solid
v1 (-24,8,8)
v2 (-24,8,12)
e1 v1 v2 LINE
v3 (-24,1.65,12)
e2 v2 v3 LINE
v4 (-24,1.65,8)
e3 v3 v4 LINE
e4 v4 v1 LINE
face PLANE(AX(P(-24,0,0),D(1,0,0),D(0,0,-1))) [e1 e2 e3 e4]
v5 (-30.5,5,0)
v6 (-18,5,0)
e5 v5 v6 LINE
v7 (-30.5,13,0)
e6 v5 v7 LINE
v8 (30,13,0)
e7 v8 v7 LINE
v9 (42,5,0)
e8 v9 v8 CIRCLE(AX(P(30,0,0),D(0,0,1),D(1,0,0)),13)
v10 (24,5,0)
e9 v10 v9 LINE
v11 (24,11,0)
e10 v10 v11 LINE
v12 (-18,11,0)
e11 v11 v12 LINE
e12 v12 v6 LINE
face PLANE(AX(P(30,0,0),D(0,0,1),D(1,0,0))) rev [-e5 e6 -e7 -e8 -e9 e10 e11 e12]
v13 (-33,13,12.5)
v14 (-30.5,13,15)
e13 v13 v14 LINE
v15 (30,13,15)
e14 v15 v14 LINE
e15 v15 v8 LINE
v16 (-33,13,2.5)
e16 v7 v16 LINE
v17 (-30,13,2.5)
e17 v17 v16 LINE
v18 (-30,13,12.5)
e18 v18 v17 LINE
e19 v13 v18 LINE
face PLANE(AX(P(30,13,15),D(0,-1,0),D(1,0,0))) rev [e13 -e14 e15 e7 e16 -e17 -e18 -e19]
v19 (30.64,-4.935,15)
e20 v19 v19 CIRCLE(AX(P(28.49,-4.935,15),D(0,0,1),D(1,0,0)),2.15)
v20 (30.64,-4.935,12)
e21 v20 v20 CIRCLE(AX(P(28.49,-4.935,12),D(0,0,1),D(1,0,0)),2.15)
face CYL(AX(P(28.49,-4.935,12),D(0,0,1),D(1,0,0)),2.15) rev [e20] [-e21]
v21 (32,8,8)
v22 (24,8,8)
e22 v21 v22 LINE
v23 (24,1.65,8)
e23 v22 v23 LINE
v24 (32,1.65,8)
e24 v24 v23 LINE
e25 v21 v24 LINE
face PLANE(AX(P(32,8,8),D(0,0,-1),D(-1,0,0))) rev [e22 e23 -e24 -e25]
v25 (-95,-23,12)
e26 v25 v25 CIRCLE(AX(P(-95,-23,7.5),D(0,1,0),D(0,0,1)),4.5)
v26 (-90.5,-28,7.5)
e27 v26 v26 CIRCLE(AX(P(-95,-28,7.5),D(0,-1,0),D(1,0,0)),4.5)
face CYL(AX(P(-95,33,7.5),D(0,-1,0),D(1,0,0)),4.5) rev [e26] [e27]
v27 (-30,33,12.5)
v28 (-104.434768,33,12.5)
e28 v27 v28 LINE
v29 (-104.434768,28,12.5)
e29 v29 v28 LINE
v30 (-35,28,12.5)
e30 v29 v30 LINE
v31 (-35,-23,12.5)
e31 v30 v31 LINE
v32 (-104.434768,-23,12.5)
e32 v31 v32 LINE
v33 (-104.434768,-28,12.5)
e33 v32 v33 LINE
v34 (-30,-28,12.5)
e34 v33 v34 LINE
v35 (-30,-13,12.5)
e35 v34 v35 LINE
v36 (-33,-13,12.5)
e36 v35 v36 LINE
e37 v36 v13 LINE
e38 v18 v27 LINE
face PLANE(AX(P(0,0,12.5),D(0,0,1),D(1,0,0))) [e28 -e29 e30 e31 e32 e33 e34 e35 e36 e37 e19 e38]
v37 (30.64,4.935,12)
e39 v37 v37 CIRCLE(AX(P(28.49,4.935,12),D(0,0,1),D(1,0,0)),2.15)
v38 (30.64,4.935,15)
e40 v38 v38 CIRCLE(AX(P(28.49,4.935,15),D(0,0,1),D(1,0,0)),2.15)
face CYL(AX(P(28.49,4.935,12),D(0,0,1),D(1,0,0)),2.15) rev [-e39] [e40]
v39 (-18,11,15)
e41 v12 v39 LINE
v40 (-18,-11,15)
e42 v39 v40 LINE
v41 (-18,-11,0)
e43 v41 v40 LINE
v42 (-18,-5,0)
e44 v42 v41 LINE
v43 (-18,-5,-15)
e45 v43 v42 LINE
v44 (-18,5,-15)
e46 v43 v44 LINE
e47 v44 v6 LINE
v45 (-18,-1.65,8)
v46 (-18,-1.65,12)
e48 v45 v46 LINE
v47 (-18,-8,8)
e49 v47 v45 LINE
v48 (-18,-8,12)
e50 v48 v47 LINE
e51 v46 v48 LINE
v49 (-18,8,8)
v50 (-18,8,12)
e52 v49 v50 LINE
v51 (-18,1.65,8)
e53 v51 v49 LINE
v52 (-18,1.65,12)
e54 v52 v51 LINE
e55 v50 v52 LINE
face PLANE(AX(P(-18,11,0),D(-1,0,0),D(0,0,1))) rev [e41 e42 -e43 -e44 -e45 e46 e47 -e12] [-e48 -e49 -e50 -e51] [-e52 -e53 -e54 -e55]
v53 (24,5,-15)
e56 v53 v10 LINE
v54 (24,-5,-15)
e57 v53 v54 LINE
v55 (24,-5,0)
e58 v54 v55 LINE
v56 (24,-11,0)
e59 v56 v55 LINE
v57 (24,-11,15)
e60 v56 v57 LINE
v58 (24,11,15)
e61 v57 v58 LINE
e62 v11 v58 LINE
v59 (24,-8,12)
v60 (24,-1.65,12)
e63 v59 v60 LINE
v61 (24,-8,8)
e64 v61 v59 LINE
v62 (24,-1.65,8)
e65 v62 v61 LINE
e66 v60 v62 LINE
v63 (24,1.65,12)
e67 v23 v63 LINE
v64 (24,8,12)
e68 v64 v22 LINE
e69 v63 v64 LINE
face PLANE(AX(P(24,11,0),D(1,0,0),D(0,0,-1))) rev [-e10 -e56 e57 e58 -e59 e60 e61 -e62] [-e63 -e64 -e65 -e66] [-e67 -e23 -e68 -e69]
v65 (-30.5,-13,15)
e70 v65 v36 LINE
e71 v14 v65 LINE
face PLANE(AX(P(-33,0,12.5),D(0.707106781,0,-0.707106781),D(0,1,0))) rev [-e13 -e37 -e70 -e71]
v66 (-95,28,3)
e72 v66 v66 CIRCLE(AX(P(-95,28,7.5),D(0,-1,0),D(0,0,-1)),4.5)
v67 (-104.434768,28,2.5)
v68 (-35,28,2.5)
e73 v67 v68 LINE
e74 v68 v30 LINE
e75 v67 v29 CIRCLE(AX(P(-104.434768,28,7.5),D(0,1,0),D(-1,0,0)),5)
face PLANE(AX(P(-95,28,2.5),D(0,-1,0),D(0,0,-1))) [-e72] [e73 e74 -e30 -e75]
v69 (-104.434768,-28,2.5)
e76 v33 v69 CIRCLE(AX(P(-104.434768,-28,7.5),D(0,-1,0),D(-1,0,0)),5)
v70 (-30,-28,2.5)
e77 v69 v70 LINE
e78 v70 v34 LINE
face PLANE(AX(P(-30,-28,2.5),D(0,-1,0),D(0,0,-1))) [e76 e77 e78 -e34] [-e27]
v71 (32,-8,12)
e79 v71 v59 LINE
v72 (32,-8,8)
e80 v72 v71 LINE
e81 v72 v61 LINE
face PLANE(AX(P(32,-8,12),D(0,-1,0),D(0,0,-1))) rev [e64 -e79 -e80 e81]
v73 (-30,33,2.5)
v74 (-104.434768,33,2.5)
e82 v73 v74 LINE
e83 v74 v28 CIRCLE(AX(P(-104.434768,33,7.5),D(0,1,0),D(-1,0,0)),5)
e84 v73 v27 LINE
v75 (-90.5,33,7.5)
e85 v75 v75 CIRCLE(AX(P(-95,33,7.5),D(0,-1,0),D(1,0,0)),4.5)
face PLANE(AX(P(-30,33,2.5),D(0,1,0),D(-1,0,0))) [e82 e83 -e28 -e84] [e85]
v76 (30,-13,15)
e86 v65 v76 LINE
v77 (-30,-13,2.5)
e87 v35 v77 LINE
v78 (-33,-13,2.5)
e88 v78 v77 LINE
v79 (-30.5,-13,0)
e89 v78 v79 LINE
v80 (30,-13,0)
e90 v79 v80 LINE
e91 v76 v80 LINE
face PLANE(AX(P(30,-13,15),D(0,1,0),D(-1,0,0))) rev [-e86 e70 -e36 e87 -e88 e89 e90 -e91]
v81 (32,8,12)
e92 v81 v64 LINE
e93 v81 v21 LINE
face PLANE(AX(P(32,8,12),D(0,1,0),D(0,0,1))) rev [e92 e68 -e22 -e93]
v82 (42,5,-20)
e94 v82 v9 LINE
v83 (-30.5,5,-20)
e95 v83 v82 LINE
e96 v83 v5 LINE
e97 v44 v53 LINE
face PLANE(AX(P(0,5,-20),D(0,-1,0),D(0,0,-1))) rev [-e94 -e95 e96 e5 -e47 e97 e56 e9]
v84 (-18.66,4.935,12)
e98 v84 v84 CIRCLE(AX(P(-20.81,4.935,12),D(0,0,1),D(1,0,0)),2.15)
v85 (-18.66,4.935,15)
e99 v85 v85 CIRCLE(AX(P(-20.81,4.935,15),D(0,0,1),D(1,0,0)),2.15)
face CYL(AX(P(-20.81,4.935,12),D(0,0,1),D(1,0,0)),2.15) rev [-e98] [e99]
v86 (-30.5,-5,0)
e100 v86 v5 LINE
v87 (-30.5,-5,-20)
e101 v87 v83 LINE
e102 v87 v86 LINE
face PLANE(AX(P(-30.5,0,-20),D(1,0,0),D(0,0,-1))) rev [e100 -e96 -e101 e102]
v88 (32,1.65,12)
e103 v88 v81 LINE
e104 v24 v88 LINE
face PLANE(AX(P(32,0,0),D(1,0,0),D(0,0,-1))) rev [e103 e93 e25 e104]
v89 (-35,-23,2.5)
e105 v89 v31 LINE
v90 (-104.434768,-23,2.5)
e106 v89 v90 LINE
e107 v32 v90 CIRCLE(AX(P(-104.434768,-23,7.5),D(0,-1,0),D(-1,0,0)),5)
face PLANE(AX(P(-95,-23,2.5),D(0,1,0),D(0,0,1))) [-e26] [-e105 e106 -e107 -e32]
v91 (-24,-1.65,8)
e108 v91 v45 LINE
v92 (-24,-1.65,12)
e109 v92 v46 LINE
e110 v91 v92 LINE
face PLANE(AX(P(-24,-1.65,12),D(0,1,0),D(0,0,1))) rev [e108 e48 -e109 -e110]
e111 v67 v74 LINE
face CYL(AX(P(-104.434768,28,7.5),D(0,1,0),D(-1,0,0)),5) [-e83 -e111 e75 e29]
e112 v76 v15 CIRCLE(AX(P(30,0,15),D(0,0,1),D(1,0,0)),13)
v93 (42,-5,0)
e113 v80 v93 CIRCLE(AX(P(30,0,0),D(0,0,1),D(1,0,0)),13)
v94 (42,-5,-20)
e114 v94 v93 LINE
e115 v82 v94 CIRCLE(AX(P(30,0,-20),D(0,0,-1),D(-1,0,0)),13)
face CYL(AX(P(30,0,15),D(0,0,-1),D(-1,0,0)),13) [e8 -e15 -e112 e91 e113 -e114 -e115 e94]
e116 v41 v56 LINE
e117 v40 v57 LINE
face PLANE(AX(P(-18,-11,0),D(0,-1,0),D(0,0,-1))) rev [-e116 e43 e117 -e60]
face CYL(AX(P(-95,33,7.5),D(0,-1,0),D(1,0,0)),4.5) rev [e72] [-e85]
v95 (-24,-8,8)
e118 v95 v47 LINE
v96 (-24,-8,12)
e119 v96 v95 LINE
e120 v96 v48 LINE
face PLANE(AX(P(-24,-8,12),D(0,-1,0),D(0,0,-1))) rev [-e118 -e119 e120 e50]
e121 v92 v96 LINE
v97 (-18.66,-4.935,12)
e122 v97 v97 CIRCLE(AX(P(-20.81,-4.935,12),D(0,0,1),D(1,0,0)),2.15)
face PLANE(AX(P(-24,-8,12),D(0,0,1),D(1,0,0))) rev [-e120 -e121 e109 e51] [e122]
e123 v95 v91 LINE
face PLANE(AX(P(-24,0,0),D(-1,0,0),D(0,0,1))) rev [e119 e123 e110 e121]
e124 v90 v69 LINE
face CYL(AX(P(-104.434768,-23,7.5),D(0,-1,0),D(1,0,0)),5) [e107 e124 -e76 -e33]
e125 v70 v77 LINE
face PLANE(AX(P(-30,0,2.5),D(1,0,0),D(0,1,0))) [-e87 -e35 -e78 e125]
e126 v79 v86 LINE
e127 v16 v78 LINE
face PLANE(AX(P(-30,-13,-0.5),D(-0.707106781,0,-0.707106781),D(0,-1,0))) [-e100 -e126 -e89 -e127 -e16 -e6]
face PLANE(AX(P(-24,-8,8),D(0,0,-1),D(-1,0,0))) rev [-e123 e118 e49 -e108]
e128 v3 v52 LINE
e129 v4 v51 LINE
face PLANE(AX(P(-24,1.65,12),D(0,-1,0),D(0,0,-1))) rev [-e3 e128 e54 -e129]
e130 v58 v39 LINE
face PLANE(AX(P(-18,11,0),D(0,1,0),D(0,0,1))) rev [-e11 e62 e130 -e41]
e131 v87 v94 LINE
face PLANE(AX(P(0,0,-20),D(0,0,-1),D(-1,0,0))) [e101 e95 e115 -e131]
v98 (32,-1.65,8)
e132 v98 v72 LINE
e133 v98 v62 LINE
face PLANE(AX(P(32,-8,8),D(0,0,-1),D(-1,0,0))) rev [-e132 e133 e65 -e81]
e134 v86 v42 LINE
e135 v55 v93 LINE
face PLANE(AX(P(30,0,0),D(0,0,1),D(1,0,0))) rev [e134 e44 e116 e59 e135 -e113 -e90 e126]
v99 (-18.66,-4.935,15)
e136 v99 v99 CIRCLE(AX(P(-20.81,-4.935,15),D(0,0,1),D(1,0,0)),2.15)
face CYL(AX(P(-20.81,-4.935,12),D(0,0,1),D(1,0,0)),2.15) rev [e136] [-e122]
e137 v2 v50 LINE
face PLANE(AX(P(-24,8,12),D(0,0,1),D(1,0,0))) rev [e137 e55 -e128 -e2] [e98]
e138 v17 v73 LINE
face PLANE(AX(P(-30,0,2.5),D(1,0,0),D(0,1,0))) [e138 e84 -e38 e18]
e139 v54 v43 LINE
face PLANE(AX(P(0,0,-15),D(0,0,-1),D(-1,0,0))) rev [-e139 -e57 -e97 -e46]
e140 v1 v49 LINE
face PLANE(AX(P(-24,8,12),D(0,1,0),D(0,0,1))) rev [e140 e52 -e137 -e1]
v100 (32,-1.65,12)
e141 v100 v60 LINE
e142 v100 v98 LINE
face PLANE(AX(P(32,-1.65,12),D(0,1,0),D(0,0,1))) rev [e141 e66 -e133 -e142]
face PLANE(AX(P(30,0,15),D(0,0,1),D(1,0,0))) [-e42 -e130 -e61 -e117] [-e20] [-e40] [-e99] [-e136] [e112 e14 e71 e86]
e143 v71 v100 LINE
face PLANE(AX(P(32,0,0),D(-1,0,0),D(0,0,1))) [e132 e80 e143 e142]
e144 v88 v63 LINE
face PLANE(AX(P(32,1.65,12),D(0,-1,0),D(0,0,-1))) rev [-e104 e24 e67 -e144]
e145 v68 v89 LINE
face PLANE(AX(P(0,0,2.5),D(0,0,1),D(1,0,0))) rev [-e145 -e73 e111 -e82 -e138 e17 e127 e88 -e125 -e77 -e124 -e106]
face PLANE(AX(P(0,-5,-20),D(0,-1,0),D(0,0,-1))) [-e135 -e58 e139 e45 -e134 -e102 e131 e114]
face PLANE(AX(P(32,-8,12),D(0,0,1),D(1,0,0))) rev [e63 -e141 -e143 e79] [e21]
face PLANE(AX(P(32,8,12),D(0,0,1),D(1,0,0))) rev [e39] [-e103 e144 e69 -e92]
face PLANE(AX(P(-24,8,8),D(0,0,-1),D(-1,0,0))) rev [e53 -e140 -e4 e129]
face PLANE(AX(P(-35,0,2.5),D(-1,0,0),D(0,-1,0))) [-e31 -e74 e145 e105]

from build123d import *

# Parameters (mm, degrees)
BOSS_EXTRU_1_DEPTH      = 15
ESQUISSE2_W             = 42
ESQUISSE2_H             = 22
ENL_V_MAT_EXTRU_1_DEPTH = 48.360320945
ESQUISSE4_R             = 2.15
ENL_V_MAT_EXTRU_2_DEPTH = 3
ESQUISSE5_W             = 4
ESQUISSE5_H             = 6.35
ENL_V_MAT_EXTRU_3_DEPTH = 6
ESQUISSE6_W             = 4
ESQUISSE6_H             = 6.35
ENL_V_MAT_EXTRU_4_DEPTH = 8
BOSS_EXTRU_2_DEPTH      = 5
BOSS_EXTRU_2_DEPTH_BACK = 5
CHANFREIN1_SIZE         = 3
BOSS_EXTRU_4_DEPTH      = 5
BOSS_EXTRU_6_START      = 20
ESQUISSE13_W            = 12.5
ESQUISSE13_H            = 10
BOSS_EXTRU_6_DEPTH      = 20
ESQUISSE14_W            = 42
ESQUISSE14_H            = 10
BOSS_EXTRU_7_DEPTH      = 5
BOSS_EXTRU_8_START      = -5
BOSS_EXTRU_8_DEPTH      = 5
ESQUISSE17_R            = 4.5
ENL_V_MAT_EXTRU_5_DEPTH = 127.873828497


with BuildPart() as part:
    # Esquisse1 → Boss.-Extru.1 (new body)
    with BuildSketch(Plane.XY):
        with BuildLine():
            Line((30, -13), (-30, -13))
            Line((-30, -13), (-30, 13))
            Line((-30, 13), (30, 13))
            ThreePointArc((30, 13), (43, 0), (30, -13))
        make_face()
    extrude(amount=BOSS_EXTRU_1_DEPTH)

    # Esquisse2 → Enlèv. mat.-Extru.1 (cut, through all)
    with BuildSketch(Plane.XY.offset(15)):
        with Locations((3, 0)):
            Rectangle(ESQUISSE2_W, ESQUISSE2_H)
    extrude(amount=-ENL_V_MAT_EXTRU_1_DEPTH, mode=Mode.SUBTRACT)

    # Esquisse4 → Enlèv. mat.-Extru.2 (cut)
    with BuildSketch(Plane.XY.offset(15)):
        with Locations((-20.81, 4.935)):
            Circle(ESQUISSE4_R)
        with Locations((-20.81, -4.935)):
            Circle(ESQUISSE4_R)
        with Locations((28.49, 4.935)):
            Circle(ESQUISSE4_R)
        with Locations((28.49, -4.935)):
            Circle(ESQUISSE4_R)
    extrude(amount=-ENL_V_MAT_EXTRU_2_DEPTH, mode=Mode.SUBTRACT)

    # Esquisse5 → Enlèv. mat.-Extru.3 (cut)
    with BuildSketch(Plane(origin=(-18, 0, 0), x_dir=(0, 0, -1), z_dir=(1, 0, 0))):
        with Locations((-10, -4.825)):
            Rectangle(ESQUISSE5_W, ESQUISSE5_H)
        with Locations((-10, 4.825)):
            Rectangle(ESQUISSE5_W, ESQUISSE5_H)
    extrude(amount=-ENL_V_MAT_EXTRU_3_DEPTH, mode=Mode.SUBTRACT)

    # Esquisse6 → Enlèv. mat.-Extru.4 (cut)
    with BuildSketch(Plane.ZY.offset(-24)):
        with Locations((10, 4.825)):
            Rectangle(ESQUISSE6_W, ESQUISSE6_H)
        with Locations((10, -4.825)):
            Rectangle(ESQUISSE6_W, ESQUISSE6_H)
    extrude(amount=-ENL_V_MAT_EXTRU_4_DEPTH, mode=Mode.SUBTRACT)

    # Esquisse9 → Boss.-Extru.2 (add, two sides: drawn at the far end of the back side and taken through both)
    with BuildSketch(Plane.XY.offset(7.5).offset(-BOSS_EXTRU_2_DEPTH_BACK)):
        Polygon((-30, 33), (-95, 33), (-95, 28), (-35, 28), (-35, 0), (-35, -23), (-95, -23), (-95, -28), (-30, -28), (-30, 0), align=None)
    extrude(amount=BOSS_EXTRU_2_DEPTH + BOSS_EXTRU_2_DEPTH_BACK)

    # Chanfrein1
    # the kernel refuses this chamfer: 3 mm, written as the material it adds along each edge
    with BuildSketch(Plane(origin=(-30, 13, 12.5), x_dir=(0.02749587661058678, 0, 0.9996219169112968), z_dir=(0, -1, 0))) as chanfrein1_piece_1_section:
        Polygon((CHANFREIN1_SIZE * 0.999621916911, CHANFREIN1_SIZE * 0.0274958766106), (-CHANFREIN1_SIZE * 0.0274958766106, CHANFREIN1_SIZE * 0.999621916911), (0, 0), align=None)
    chanfrein1_piece_1 = extrude(amount=26, mode=Mode.PRIVATE)
    chanfrein1_piece_1 = split(chanfrein1_piece_1, bisect_by=Plane(origin=(-31.023809524, 0, 15), z_dir=(0, 0, -1)), keep=Keep.TOP, mode=Mode.PRIVATE)
    add(chanfrein1_piece_1)
    with BuildSketch(Plane(origin=(-30, -13, 2.5), x_dir=(0.027495876610585626, 0, -0.9996219169112968), z_dir=(0, 1, 0))) as chanfrein1_piece_2_section:
        Polygon((CHANFREIN1_SIZE * 0.999621916911, CHANFREIN1_SIZE * 0.0274958766106), (-CHANFREIN1_SIZE * 0.0274958766106, CHANFREIN1_SIZE * 0.999621916911), (0, 0), align=None)
    chanfrein1_piece_2 = extrude(amount=26, mode=Mode.PRIVATE)
    chanfrein1_piece_2 = split(chanfrein1_piece_2, bisect_by=Plane(origin=(-31.023809524, 0, 0), z_dir=(0, 0, 1)), keep=Keep.TOP, mode=Mode.PRIVATE)
    add(chanfrein1_piece_2)

    # Esquisse11 → Boss.-Extru.4 (add)
    with BuildSketch(Plane.XZ.offset(28)):
        with BuildLine():
            Line((-95, 2.5), (-95, 12.5))
            Line((-95, 12.5), (-104.43476759, 12.5))
            ThreePointArc((-104.43476759, 12.5), (-109.43476759, 7.5), (-104.43476759, 2.5))
            Line((-104.43476759, 2.5), (-95, 2.5))
        make_face()
    extrude(amount=-BOSS_EXTRU_4_DEPTH)

    # Esquisse13 → Boss.-Extru.6 (add)
    with BuildSketch(Plane(origin=(0, 0, 0), x_dir=(-1, 0, 0), z_dir=(0, 0, -1)).offset(BOSS_EXTRU_6_START)):
        with BuildLine():
            Line((-24, -5), (-24, 5))
            Line((-24, 5), (-42, 5))
            ThreePointArc((-42, 5), (-43, 0), (-42, -5))
            Line((-42, -5), (-24, -5))
        make_face()
        with Locations((24.25, 0)):
            Rectangle(ESQUISSE13_W, ESQUISSE13_H)
    extrude(amount=-BOSS_EXTRU_6_DEPTH)

    # Esquisse14 → Boss.-Extru.7 (add)
    with BuildSketch(Plane(origin=(0, 0, -20), x_dir=(-1, 0, 0), z_dir=(0, 0, -1))):
        with Locations((-3, 0)):
            Rectangle(ESQUISSE14_W, ESQUISSE14_H)
    extrude(amount=-BOSS_EXTRU_7_DEPTH)

    # Esquisse16 → Boss.-Extru.8 (add)
    with BuildSketch(Plane(origin=(0, 33, 0), x_dir=(1, 0, 0), z_dir=(0, 1, 0)).offset(BOSS_EXTRU_8_START)):
        with BuildLine():
            Line((-89.416041875, -12.5), (-104.43476759, -12.5))
            ThreePointArc((-104.43476759, -12.5), (-109.43476759, -7.5), (-104.43476759, -2.5))
            Line((-104.43476759, -2.5), (-89.416041875, -2.5))
            Line((-89.416041875, -2.5), (-89.416041875, -12.5))
        make_face()
    extrude(amount=BOSS_EXTRU_8_DEPTH)

    # Esquisse17 → Enlèv. mat.-Extru.5 (cut, through all)
    with BuildSketch(Plane.XZ.offset(28)):
        with Locations((-95, 7.5)):
            Circle(ESQUISSE17_R)
    extrude(amount=-ENL_V_MAT_EXTRU_5_DEPTH, mode=Mode.SUBTRACT)


solid = part.part
